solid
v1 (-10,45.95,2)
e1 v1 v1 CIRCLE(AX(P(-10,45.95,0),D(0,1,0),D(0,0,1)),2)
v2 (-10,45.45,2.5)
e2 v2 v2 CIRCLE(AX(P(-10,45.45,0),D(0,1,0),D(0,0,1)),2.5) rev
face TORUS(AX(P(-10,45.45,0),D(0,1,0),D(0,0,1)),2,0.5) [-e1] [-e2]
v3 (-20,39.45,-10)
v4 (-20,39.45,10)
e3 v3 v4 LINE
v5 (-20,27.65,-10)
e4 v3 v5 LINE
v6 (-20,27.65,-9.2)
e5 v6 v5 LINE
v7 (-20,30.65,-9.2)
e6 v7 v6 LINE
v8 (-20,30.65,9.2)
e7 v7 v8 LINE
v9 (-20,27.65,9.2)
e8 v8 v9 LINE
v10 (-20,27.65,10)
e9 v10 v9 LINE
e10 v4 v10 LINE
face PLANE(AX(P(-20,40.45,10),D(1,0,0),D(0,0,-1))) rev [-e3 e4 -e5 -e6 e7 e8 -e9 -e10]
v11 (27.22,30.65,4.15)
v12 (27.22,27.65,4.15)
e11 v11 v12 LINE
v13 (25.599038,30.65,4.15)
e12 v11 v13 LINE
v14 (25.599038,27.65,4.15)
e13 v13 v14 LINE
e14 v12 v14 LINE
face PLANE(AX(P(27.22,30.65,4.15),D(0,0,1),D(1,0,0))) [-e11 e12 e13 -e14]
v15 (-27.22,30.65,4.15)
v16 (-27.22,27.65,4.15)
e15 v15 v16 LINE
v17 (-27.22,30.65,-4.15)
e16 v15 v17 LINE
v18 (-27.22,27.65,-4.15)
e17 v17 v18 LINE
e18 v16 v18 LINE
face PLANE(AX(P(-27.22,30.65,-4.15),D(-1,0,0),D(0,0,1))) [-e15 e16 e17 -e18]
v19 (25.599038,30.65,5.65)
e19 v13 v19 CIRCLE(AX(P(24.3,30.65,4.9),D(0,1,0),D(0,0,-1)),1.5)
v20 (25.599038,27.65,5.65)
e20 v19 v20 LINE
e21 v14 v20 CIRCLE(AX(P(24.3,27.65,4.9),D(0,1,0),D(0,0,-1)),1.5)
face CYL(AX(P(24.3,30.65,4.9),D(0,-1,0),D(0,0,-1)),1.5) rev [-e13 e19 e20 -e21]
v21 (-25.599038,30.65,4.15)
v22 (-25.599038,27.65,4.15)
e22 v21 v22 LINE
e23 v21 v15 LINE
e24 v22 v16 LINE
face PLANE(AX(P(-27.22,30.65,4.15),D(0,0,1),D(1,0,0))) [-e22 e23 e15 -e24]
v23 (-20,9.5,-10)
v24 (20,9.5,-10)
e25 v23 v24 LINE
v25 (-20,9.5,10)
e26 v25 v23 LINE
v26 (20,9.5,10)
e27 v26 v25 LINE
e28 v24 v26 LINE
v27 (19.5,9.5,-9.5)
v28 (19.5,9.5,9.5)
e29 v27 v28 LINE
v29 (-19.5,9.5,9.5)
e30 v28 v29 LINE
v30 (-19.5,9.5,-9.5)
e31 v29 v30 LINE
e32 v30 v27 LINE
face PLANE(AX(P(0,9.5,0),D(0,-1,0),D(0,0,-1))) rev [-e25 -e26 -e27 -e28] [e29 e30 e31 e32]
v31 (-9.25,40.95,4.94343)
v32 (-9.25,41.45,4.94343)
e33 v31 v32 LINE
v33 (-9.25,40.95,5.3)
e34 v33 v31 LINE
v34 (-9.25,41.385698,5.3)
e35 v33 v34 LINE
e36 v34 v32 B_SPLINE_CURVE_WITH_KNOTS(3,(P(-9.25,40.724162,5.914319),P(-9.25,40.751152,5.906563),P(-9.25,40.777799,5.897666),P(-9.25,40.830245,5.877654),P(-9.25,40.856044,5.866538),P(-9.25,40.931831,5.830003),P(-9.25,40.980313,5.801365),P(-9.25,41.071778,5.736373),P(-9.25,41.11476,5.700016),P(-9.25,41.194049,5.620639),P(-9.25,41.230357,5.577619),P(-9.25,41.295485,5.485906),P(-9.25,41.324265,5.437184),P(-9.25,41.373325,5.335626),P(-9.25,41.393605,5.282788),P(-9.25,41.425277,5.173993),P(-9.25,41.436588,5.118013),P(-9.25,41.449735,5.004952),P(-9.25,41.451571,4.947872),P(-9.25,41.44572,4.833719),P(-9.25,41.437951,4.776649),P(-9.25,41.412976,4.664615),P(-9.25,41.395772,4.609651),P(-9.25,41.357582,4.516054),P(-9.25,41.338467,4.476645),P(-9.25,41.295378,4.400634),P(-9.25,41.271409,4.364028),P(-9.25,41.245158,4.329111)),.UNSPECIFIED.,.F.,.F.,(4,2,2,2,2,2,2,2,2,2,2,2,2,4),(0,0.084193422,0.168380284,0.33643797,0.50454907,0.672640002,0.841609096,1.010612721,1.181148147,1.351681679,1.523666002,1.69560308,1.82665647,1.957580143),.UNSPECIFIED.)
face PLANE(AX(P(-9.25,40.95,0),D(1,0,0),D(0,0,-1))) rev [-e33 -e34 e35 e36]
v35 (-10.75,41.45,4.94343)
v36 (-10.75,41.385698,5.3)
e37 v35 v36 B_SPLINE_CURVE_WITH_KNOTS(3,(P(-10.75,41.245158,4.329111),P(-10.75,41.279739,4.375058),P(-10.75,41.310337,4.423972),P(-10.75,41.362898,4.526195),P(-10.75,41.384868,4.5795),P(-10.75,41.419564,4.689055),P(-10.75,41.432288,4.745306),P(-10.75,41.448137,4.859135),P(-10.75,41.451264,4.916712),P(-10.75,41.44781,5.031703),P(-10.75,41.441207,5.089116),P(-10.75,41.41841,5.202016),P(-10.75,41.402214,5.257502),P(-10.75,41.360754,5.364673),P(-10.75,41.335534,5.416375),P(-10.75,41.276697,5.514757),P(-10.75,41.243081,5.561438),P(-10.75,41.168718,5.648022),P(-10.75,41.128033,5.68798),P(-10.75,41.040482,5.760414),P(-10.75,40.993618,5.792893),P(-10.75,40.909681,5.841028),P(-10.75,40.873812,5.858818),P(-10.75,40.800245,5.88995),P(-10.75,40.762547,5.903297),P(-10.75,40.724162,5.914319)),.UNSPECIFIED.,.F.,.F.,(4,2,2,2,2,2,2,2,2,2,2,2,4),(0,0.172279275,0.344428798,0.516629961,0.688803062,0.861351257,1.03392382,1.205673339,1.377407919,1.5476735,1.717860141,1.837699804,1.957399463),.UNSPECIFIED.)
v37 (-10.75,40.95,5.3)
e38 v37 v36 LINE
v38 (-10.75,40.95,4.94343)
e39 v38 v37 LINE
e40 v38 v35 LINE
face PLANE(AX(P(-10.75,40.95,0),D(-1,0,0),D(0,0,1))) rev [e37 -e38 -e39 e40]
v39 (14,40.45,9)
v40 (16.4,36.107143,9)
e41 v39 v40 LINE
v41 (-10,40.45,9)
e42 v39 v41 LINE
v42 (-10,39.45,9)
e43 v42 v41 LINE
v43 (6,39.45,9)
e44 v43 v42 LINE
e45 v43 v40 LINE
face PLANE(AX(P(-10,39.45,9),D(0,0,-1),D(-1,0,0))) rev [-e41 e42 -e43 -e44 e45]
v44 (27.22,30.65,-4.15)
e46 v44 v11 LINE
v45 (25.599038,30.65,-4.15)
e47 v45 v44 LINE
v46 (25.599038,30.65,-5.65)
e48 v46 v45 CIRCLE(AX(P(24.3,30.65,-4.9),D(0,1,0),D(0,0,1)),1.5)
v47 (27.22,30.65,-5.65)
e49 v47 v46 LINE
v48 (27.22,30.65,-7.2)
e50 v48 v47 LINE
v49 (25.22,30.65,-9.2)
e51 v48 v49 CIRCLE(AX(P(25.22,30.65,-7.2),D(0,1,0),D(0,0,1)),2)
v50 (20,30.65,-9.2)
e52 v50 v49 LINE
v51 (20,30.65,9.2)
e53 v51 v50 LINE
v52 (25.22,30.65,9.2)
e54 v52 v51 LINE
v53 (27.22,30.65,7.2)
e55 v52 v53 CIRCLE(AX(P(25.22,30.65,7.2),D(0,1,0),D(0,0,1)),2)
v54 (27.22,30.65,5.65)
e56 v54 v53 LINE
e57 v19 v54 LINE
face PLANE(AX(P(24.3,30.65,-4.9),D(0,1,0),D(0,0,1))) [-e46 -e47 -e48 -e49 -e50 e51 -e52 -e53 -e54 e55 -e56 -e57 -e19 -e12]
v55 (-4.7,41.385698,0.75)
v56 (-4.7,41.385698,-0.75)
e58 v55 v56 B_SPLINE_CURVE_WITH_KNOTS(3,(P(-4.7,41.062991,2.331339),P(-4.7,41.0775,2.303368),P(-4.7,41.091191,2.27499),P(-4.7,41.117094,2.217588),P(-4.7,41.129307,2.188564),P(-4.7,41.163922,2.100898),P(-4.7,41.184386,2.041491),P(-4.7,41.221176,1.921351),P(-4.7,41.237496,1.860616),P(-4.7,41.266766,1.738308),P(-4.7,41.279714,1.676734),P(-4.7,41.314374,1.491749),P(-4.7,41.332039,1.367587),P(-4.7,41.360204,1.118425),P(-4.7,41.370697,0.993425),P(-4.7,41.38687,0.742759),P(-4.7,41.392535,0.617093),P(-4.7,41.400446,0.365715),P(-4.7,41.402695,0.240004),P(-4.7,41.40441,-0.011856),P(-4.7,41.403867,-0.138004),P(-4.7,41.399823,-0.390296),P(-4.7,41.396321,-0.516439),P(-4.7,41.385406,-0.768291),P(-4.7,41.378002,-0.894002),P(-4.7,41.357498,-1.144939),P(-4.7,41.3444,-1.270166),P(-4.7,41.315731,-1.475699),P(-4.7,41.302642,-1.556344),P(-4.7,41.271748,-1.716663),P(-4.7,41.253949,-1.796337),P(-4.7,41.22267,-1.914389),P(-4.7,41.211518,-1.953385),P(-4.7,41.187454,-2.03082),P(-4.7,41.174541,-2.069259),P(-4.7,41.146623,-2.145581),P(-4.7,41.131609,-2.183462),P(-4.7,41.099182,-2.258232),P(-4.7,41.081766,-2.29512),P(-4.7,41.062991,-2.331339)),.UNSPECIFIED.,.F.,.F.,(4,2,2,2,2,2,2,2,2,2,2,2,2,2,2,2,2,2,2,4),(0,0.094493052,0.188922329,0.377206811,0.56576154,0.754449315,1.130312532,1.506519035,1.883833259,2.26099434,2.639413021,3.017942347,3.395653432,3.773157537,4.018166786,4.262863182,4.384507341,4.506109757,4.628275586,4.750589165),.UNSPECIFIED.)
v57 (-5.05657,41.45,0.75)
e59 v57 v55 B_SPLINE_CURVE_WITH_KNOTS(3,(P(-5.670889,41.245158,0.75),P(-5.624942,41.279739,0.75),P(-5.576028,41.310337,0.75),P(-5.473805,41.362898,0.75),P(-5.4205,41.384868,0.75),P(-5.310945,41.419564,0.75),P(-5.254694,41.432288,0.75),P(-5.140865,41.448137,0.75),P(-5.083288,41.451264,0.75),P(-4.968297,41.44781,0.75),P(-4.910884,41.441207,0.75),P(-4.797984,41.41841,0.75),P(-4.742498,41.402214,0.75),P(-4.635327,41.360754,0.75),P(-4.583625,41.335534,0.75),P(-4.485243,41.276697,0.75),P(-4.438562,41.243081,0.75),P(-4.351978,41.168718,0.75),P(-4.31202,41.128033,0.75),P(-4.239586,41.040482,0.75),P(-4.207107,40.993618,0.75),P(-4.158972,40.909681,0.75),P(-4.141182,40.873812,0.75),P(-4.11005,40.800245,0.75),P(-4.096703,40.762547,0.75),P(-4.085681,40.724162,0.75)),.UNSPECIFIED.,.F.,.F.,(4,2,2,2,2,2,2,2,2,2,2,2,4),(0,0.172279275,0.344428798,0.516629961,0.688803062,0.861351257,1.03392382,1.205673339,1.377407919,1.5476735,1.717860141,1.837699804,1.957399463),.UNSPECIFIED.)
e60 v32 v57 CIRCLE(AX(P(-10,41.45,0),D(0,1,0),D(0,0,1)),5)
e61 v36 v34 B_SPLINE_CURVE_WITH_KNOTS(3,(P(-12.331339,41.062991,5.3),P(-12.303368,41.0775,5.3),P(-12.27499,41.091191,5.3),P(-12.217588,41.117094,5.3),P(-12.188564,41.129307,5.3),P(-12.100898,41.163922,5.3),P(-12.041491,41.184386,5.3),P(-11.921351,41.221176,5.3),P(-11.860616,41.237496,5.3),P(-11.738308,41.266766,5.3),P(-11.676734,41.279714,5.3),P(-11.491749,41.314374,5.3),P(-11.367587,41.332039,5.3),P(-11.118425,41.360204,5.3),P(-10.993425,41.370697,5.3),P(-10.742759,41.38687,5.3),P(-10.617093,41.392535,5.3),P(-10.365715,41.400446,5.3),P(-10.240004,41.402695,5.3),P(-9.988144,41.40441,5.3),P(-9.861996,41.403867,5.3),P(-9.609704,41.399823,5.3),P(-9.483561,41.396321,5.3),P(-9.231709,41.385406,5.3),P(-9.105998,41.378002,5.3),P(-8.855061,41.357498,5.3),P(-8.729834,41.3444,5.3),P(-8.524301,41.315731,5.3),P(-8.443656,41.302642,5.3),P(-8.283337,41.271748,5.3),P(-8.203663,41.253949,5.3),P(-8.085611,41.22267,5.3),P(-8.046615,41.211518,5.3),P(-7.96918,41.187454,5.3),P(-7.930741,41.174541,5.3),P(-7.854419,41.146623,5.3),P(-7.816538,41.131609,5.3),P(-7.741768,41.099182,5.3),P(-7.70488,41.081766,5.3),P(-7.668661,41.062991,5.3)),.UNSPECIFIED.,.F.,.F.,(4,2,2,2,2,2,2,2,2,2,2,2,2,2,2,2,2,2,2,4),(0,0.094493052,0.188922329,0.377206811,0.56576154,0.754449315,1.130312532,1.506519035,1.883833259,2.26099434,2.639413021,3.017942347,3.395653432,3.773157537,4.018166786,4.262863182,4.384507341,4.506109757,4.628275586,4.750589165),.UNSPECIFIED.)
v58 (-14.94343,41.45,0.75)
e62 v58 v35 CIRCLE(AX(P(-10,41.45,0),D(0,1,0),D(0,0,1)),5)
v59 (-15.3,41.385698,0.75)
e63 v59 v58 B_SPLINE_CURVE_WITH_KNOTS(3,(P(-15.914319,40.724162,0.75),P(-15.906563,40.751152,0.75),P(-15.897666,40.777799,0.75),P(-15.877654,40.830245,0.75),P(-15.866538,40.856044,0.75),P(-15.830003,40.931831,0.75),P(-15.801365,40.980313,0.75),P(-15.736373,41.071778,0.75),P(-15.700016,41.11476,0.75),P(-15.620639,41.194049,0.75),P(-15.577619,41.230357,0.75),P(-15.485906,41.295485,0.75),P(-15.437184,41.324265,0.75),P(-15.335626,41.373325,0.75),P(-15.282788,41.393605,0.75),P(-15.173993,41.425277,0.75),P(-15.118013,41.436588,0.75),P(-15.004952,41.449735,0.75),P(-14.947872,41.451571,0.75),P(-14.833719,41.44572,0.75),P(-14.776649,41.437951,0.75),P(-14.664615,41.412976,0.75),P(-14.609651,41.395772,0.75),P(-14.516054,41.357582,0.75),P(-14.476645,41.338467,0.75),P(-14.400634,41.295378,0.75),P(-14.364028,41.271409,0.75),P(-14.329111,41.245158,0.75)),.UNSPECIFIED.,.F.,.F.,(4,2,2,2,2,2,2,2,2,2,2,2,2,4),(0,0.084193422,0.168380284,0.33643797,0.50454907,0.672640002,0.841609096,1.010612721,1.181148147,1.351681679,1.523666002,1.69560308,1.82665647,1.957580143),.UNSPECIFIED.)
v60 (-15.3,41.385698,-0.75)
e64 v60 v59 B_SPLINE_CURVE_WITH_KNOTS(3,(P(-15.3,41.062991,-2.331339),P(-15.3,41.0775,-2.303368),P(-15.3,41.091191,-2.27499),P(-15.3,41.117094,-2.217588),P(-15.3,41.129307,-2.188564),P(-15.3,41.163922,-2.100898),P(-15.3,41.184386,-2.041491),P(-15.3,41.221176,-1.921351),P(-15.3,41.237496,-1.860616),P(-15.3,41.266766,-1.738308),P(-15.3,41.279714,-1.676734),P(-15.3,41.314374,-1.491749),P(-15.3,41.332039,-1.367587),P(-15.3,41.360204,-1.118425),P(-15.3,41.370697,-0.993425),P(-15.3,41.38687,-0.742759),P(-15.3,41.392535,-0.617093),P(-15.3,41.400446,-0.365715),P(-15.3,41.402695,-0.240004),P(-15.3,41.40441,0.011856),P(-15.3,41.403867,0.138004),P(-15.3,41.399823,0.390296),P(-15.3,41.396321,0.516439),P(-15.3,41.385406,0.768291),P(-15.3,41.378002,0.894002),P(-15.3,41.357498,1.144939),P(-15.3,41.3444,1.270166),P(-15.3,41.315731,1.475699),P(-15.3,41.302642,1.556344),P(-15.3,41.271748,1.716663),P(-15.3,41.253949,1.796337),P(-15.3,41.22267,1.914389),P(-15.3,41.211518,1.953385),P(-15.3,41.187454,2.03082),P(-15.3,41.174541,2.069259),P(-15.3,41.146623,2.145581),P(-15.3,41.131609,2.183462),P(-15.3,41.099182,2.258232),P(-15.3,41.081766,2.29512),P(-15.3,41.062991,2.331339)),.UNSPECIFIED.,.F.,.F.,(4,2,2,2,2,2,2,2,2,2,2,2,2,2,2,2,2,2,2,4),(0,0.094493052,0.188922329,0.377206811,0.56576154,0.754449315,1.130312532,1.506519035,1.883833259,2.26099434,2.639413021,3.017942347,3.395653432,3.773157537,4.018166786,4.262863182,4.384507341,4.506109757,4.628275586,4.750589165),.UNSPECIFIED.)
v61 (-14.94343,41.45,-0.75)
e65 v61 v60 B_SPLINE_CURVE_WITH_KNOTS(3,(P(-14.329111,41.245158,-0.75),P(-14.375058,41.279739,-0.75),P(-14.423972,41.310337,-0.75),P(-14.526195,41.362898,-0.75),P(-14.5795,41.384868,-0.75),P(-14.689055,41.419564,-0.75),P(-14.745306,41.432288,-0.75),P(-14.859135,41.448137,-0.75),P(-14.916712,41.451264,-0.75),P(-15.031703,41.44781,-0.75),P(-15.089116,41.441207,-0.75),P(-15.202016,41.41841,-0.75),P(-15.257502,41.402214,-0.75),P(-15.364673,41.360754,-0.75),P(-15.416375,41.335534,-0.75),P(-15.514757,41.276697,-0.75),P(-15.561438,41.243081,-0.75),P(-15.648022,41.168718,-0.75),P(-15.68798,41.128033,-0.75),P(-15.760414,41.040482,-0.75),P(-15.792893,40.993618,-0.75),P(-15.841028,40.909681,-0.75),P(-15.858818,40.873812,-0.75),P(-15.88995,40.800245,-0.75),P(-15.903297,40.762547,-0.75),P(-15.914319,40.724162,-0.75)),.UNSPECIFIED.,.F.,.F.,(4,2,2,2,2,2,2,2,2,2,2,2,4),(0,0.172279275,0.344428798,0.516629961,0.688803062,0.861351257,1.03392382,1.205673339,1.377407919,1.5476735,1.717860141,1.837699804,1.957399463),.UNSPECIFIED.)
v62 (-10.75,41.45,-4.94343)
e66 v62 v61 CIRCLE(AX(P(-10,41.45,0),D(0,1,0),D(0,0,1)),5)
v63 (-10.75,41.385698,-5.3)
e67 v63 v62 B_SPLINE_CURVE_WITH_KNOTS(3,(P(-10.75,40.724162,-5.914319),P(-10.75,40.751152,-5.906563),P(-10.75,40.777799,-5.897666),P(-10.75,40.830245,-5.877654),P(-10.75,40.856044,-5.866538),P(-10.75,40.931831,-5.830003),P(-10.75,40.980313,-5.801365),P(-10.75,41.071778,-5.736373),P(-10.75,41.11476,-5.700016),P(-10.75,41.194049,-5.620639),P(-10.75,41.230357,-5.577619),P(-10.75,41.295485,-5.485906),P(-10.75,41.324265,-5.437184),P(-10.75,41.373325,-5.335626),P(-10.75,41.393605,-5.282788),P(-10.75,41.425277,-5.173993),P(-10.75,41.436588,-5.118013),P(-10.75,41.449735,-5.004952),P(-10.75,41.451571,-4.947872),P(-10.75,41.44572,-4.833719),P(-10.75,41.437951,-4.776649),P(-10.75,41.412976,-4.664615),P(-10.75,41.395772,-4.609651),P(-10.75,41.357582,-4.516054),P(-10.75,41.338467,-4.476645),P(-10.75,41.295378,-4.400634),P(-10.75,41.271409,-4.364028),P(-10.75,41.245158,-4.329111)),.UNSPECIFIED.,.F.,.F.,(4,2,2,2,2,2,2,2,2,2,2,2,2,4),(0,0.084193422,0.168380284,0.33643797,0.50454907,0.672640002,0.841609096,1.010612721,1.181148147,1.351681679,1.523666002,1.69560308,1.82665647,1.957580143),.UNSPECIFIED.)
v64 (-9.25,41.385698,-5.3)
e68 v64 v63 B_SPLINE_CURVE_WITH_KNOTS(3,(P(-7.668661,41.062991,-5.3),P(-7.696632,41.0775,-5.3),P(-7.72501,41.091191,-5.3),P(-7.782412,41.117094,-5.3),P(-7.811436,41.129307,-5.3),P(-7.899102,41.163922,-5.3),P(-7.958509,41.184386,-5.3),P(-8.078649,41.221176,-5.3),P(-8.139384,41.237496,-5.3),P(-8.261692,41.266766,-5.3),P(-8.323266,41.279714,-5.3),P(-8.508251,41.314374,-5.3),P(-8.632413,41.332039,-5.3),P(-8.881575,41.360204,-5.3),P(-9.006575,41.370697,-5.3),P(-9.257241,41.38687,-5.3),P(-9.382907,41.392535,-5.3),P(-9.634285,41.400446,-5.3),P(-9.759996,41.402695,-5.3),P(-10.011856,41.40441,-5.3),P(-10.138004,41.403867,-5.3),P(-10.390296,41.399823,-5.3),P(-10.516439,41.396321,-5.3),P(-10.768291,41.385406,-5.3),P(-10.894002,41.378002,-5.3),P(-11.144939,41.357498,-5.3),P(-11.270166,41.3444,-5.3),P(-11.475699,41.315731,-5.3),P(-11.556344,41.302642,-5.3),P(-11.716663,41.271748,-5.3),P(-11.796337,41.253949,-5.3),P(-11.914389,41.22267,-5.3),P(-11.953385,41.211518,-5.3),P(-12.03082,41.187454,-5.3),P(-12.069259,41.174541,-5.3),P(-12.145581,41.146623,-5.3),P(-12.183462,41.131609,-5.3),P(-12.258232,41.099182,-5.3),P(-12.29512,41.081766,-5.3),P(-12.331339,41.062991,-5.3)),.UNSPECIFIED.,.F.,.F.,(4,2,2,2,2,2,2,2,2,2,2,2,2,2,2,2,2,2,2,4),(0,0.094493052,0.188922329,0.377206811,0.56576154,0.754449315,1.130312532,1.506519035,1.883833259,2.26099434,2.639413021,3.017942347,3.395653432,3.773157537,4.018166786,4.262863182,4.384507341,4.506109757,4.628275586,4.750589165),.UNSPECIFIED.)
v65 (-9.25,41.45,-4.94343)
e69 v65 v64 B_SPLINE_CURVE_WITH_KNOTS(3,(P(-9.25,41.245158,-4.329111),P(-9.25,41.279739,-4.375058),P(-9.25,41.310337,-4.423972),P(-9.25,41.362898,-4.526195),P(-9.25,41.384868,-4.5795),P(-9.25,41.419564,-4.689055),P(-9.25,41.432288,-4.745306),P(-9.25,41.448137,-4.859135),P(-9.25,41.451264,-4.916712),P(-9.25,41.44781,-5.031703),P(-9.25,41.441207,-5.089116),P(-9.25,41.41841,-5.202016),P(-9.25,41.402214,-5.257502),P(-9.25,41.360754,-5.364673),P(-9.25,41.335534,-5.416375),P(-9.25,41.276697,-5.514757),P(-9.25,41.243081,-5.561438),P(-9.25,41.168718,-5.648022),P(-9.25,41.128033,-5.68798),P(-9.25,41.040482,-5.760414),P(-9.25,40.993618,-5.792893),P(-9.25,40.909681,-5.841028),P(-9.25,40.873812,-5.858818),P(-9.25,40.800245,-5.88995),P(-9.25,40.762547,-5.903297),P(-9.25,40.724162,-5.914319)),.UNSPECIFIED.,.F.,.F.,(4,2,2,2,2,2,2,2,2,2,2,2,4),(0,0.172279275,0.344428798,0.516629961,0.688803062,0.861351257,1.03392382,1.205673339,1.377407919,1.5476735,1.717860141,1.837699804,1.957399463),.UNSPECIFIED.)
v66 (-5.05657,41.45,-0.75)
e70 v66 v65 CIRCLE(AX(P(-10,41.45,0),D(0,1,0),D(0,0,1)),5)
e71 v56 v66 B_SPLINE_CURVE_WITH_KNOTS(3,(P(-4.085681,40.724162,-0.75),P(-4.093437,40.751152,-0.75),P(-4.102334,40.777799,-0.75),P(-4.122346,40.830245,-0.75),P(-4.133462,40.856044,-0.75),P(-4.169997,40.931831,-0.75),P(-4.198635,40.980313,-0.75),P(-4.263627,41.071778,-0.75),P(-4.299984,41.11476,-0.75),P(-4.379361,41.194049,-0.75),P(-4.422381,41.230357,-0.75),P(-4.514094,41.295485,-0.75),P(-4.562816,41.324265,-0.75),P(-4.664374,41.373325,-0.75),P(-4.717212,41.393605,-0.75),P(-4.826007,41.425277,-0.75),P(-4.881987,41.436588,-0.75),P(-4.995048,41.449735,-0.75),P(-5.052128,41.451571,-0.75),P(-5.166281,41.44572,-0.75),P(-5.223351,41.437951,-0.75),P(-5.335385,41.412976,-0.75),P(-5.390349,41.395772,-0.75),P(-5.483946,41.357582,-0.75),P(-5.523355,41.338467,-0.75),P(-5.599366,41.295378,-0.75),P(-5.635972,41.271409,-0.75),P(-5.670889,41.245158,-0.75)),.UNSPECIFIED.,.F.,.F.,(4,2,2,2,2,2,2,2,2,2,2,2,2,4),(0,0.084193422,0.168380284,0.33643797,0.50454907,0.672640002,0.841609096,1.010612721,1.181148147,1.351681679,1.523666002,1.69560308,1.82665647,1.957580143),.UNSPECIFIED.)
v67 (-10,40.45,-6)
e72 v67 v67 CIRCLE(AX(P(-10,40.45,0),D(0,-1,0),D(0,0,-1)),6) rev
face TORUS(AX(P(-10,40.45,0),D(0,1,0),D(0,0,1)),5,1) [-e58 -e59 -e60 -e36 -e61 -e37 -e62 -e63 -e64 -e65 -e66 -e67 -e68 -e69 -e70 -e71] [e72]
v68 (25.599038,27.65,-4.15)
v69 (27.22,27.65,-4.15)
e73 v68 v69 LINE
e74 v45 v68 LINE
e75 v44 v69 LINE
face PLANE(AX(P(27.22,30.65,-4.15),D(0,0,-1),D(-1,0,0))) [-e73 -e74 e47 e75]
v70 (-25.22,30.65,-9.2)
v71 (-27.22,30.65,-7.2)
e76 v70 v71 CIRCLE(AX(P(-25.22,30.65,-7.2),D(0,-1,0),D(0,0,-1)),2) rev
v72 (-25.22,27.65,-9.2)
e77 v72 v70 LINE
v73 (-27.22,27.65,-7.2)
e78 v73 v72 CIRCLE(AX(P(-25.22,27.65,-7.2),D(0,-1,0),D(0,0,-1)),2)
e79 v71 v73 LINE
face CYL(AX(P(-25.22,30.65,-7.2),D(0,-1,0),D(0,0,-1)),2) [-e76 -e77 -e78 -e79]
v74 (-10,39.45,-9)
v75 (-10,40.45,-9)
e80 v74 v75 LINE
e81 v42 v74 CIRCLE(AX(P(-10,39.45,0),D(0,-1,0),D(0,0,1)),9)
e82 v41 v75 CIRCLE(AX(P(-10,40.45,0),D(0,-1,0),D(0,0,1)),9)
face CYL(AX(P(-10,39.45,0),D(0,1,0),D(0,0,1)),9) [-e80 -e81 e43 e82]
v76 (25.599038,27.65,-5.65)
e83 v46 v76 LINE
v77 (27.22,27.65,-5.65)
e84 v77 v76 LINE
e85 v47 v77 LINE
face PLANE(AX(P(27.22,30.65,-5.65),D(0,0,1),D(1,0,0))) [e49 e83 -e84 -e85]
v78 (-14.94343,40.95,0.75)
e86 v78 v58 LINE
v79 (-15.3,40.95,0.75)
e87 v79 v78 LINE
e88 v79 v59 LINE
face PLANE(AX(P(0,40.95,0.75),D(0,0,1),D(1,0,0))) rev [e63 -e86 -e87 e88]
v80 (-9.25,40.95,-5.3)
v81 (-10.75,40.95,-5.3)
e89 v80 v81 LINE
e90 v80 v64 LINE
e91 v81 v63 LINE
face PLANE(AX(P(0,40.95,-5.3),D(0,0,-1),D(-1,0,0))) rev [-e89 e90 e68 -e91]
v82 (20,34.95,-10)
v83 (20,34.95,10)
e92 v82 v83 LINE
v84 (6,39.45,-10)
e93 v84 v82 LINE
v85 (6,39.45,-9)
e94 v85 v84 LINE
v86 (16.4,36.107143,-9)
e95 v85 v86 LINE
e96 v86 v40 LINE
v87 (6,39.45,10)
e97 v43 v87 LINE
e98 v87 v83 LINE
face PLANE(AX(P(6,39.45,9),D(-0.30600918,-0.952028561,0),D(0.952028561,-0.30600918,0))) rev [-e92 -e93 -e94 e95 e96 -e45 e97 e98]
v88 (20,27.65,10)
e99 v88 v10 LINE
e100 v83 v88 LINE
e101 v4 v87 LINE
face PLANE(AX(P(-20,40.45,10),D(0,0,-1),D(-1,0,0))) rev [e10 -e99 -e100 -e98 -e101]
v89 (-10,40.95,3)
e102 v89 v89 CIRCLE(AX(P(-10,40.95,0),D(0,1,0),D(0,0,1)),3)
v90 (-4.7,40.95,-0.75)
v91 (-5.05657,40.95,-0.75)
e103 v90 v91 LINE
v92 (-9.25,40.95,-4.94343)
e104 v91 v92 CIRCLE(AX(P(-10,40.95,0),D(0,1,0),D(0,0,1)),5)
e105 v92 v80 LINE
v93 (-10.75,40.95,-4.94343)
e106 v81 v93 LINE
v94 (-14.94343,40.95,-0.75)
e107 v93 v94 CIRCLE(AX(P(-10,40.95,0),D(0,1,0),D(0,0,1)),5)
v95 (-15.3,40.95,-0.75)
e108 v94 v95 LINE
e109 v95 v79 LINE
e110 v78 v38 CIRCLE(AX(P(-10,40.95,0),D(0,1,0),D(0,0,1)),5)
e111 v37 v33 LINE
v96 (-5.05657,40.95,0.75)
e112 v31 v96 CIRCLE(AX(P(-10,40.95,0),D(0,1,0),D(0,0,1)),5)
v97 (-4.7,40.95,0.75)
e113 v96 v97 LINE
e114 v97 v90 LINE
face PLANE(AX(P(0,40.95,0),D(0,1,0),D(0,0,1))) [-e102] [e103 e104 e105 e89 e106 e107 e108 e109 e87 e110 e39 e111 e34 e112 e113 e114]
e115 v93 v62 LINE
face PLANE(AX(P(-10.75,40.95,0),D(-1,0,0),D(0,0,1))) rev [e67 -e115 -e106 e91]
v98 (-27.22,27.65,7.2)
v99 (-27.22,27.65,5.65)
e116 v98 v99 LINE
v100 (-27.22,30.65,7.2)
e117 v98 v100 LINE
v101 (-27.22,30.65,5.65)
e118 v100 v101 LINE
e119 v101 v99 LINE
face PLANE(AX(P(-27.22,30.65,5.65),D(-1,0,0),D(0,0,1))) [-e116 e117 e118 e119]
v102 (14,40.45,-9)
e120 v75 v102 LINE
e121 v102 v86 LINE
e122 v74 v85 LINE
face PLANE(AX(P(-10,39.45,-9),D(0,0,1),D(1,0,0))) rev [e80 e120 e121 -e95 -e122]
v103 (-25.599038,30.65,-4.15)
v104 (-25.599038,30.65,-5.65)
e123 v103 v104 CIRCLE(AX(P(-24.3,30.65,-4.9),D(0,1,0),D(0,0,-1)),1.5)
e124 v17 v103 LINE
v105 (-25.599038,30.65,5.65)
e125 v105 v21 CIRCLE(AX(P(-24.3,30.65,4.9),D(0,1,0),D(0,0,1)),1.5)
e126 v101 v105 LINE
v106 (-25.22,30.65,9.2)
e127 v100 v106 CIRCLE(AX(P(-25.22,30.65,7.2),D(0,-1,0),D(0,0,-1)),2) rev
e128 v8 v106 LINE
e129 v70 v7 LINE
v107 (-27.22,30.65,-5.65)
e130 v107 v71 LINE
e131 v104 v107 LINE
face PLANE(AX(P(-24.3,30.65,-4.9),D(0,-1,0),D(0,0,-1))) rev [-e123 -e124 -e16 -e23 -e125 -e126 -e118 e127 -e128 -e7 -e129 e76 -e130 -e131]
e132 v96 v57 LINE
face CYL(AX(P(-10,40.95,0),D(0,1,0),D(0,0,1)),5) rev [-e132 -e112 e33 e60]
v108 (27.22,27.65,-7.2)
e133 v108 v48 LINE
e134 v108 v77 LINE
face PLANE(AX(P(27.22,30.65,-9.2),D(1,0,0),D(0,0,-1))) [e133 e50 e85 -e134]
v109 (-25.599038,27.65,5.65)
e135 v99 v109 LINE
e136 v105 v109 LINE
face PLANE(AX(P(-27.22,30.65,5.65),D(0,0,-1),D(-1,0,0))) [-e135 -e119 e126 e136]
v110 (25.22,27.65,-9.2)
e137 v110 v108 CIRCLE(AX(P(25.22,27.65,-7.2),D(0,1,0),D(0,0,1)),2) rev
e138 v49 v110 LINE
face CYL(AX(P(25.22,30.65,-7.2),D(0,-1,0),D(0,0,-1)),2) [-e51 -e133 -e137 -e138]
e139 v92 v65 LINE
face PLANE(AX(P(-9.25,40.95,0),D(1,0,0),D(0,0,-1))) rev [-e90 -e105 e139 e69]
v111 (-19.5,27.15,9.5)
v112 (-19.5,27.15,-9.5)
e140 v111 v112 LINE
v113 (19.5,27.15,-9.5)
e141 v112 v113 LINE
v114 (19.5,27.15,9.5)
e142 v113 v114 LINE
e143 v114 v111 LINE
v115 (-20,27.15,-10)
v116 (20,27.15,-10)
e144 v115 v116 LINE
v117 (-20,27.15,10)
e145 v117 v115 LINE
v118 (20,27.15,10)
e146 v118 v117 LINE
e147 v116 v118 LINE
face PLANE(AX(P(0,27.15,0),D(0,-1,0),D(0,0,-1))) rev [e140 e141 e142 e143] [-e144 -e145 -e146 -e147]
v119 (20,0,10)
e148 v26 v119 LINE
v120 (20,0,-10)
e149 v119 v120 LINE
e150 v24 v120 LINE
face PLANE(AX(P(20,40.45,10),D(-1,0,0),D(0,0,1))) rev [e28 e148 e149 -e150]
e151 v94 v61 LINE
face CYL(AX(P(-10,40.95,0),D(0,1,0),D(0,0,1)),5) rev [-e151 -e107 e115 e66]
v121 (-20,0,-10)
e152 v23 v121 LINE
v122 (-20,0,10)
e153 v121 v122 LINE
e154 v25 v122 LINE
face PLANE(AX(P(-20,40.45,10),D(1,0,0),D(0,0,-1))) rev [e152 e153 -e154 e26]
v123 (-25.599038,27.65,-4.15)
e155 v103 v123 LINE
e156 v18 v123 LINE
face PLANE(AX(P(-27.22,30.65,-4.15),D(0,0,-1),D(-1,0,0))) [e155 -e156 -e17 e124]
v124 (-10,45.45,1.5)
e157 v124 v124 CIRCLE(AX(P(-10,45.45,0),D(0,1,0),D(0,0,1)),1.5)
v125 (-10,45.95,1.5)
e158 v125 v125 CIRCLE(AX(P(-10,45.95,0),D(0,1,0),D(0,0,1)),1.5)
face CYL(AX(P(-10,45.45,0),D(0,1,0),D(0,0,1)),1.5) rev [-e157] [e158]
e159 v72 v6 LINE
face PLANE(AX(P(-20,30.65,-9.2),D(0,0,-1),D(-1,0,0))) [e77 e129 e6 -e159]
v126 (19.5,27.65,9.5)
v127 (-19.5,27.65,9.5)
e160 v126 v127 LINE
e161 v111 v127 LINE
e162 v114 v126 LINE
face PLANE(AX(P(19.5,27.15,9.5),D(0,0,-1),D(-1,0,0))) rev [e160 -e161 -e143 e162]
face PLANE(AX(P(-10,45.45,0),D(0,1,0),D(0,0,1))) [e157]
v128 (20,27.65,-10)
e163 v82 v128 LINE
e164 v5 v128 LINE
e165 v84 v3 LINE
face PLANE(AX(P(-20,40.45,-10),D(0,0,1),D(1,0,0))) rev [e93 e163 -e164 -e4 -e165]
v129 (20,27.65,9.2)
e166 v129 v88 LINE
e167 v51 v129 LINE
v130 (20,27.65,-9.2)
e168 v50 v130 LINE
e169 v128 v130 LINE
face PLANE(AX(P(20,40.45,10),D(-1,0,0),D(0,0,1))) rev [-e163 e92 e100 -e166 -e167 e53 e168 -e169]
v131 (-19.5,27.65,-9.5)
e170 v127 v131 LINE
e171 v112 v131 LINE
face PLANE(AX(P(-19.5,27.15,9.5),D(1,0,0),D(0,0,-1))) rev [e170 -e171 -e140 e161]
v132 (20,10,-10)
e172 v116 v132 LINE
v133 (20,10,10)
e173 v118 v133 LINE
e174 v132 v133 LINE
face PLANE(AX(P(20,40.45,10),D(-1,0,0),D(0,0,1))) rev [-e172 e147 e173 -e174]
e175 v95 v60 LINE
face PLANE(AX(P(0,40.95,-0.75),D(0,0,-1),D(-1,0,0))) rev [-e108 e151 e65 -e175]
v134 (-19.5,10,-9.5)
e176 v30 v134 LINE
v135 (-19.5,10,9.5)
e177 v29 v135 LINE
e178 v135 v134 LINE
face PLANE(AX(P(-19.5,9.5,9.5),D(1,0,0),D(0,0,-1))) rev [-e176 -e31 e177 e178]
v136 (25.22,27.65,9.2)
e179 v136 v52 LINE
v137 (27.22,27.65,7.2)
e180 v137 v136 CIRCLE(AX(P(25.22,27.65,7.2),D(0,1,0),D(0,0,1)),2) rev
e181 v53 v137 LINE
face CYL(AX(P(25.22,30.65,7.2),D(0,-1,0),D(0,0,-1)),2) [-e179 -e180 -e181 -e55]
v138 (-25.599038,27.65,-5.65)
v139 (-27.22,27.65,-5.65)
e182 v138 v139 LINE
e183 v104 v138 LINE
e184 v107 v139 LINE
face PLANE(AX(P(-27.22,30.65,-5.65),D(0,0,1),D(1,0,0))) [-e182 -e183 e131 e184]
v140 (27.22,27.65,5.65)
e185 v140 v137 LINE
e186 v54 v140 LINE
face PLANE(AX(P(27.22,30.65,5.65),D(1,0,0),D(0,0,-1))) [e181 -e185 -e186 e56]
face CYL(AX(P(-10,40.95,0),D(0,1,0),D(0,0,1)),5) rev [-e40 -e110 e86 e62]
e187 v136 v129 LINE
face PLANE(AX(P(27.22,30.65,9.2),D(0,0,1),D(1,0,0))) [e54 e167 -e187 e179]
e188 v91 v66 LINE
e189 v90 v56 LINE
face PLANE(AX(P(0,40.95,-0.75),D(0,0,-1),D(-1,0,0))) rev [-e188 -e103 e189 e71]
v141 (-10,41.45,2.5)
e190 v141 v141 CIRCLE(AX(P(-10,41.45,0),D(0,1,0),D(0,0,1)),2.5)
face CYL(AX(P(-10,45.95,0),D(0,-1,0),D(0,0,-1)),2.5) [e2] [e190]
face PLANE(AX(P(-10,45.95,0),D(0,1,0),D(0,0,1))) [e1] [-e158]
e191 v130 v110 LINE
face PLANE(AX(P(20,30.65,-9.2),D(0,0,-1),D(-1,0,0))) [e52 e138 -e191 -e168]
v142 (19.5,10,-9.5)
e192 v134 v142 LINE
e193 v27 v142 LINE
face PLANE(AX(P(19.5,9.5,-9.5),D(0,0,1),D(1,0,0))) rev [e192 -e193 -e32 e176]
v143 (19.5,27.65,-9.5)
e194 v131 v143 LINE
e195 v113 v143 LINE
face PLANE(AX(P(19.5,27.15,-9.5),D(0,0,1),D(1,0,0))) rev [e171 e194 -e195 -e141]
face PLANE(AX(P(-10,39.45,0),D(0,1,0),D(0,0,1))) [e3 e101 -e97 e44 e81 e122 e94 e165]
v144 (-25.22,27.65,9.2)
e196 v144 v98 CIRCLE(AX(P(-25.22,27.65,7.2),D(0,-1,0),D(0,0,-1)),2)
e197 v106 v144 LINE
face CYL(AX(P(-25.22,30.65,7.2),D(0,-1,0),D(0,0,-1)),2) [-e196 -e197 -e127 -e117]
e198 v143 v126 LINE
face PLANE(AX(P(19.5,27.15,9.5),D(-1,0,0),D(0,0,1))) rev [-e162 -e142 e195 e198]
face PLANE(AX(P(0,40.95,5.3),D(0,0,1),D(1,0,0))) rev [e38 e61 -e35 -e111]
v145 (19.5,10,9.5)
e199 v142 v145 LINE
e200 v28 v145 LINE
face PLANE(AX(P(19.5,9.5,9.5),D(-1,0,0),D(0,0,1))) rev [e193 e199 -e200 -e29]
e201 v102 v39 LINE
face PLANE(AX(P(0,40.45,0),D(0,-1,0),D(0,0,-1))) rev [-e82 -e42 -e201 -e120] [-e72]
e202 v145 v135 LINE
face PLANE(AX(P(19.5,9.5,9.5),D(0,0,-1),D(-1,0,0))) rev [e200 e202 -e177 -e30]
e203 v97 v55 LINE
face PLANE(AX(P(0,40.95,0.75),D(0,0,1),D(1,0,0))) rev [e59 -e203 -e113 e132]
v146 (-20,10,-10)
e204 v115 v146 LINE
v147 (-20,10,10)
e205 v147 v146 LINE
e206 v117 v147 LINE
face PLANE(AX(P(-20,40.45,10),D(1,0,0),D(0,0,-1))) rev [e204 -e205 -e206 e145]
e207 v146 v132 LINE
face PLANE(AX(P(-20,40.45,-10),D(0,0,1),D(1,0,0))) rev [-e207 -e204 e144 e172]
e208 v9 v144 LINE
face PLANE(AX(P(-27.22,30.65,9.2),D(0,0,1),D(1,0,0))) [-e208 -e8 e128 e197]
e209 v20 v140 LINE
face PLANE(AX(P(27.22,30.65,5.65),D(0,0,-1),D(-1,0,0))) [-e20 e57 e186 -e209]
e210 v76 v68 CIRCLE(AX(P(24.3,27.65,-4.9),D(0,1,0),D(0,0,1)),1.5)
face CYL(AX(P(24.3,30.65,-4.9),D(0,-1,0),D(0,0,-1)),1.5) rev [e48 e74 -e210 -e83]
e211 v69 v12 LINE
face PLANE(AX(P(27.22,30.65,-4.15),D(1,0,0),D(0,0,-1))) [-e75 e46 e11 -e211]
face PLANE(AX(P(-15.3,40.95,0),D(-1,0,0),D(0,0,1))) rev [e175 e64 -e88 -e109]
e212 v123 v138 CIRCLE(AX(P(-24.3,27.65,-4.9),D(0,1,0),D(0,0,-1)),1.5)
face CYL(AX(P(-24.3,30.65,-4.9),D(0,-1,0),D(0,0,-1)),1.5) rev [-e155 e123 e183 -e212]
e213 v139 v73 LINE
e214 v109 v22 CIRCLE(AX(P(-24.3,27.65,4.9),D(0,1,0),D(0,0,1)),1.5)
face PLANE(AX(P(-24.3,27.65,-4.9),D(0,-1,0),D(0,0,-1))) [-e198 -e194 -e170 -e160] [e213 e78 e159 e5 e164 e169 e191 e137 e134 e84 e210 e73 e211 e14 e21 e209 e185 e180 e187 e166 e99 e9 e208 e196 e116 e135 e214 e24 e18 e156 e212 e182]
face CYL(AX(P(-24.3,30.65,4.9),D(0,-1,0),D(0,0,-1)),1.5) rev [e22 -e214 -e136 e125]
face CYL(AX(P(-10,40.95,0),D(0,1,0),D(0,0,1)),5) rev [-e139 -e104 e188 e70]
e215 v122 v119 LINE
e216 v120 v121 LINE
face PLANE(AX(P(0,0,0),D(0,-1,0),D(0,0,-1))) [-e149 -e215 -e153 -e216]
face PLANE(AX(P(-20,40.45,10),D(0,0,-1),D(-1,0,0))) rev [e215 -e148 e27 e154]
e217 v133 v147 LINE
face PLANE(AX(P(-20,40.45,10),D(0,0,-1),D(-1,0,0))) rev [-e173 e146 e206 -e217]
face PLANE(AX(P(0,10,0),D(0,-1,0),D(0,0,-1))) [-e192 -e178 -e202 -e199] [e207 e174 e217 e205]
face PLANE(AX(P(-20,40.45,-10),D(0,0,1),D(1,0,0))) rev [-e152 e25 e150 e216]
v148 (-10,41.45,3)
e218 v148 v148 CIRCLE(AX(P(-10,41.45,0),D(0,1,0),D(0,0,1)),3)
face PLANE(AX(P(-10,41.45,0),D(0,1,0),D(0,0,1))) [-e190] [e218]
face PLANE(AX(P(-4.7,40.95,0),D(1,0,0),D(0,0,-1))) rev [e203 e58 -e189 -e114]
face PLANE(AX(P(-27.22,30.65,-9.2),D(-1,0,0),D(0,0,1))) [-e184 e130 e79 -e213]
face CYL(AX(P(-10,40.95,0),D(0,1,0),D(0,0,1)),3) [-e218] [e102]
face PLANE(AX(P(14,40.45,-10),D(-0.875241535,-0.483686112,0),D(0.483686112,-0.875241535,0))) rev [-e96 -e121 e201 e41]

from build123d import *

# Parameters (mm, degrees)
SKETCH_1_W          = 40
SKETCH_1_H          = 20
EXTRUDE_1_DEPTH     = 40.45
EXTRUDE_2_DEPTH     = 3
FILLET_1_R          = 2
SKETCH_4_W          = 40
SKETCH_4_H          = 20
SKETCH_4_W_2        = 39
SKETCH_4_H_2        = 19
CUT_EXTRUDE_2_DEPTH = 0.5
SKETCH_5_W          = 40
SKETCH_5_H          = 20
SKETCH_5_W_2        = 39
SKETCH_5_H_2        = 19
CUT_EXTRUDE_3_DEPTH = 0.5
SKETCH_6_R          = 6
EXTRUDE_3_DEPTH     = 1
FILLET_2_R          = 1
SKETCH_7_R          = 5
SKETCH_7_R_2        = 3
SKETCH_7_R_3        = 2.5
CUT_EXTRUDE_4_DEPTH = 0.5
CUT_EXTRUDE_6_DEPTH = 1
CUT_EXTRUDE_7_DEPTH = 1
CUT_EXTRUDE_8_DEPTH = 54.103963207
EXTRUDE_START       = 5
SKETCH_11_R         = 2.5
EXTRUDE_4_DEPTH     = 5
SKETCH_12_R         = 1.5
CUT_EXTRUDE_9_DEPTH = 0.5
FILLET_3_R          = 0.5


with BuildPart() as part:
    # 草图1 → 凸台-拉伸1 (new body)
    with BuildSketch(Plane(origin=(0, 0, 0), x_dir=(1, 0, 0), z_dir=(0, 1, 0))):
        Rectangle(SKETCH_1_W, SKETCH_1_H)
    extrude(amount=EXTRUDE_1_DEPTH)

    # 草图2 → 凸台-拉伸2 (add)
    with BuildSketch(Plane(origin=(0, 27.65, 0), x_dir=(-1, 0, 0), z_dir=(0, -1, 0))):
        with BuildLine():
            Line((20, 9.2), (27.22, 9.2))
            Line((27.22, 9.2), (27.22, 5.65))
            Line((27.22, 5.65), (25.599038106, 5.65))
            ThreePointArc((25.599038106, 5.65), (22.8, 4.9), (25.599038106, 4.15))
            Line((25.599038106, 4.15), (27.22, 4.15))
            Line((27.22, 4.15), (27.22, -4.15))
            Line((27.22, -4.15), (25.599038106, -4.15))
            ThreePointArc((25.599038106, -4.15), (22.8, -4.9), (25.599038106, -5.65))
            Line((25.599038106, -5.65), (27.22, -5.65))
            Line((27.22, -5.65), (27.22, -9.2))
            Line((27.22, -9.2), (20, -9.2))
            Line((20, -9.2), (20, 9.2))
        make_face()
        with BuildLine():
            Line((-20, 9.2), (-20, -9.2))
            Line((-20, -9.2), (-27.22, -9.2))
            Line((-27.22, -9.2), (-27.22, -5.65))
            Line((-27.22, -5.65), (-25.599038106, -5.65))
            ThreePointArc((-25.599038106, -5.65), (-22.8, -4.9), (-25.599038106, -4.15))
            Line((-25.599038106, -4.15), (-27.22, -4.15))
            Line((-27.22, -4.15), (-27.22, 4.15))
            Line((-27.22, 4.15), (-25.599038106, 4.15))
            ThreePointArc((-25.599038106, 4.15), (-22.8, 4.9), (-25.599038106, 5.65))
            Line((-25.599038106, 5.65), (-27.22, 5.65))
            Line((-27.22, 5.65), (-27.22, 9.2))
            Line((-27.22, 9.2), (-20, 9.2))
        make_face()
    extrude(amount=-EXTRUDE_2_DEPTH)

    # 圆角1
    fillet_1_edges = [part.edges().sort_by_distance(p)[0] for p in [
        (-27.22, 29.15, -9.2),
        (-27.22, 29.15, 9.2),
        (27.22, 29.15, -9.2),
        (27.22, 29.15, 9.2),
    ]]
    fillet(fillet_1_edges, radius=FILLET_1_R)

    # 草图4 → 切除-拉伸2 (cut)
    with BuildSketch(Plane(origin=(0, 27.65, 0), x_dir=(-1, 0, 0), z_dir=(0, -1, 0))):
        Rectangle(SKETCH_4_W, SKETCH_4_H)
        Rectangle(SKETCH_4_W_2, SKETCH_4_H_2, mode=Mode.SUBTRACT)
    extrude(amount=CUT_EXTRUDE_2_DEPTH, mode=Mode.SUBTRACT)

    # 草图5 → 切除-拉伸3 (cut)
    with BuildSketch(Plane(origin=(0, 10, 0), x_dir=(-1, 0, 0), z_dir=(0, -1, 0))):
        Rectangle(SKETCH_5_W, SKETCH_5_H)
        Rectangle(SKETCH_5_W_2, SKETCH_5_H_2, mode=Mode.SUBTRACT)
    extrude(amount=CUT_EXTRUDE_3_DEPTH, mode=Mode.SUBTRACT)

    # 草图6 → 凸台-拉伸3 (add)
    with BuildSketch(Plane(origin=(0, 40.45, 0), x_dir=(1, 0, 0), z_dir=(0, 1, 0))):
        with Locations(Location((-10, 0, 0), (0, 0, 90))):
            Circle(SKETCH_6_R)
    extrude(amount=EXTRUDE_3_DEPTH)

    # 圆角2
    fillet_2_edges = [part.edges().sort_by_distance(p)[0] for p in [
        (-10, 41.45, 6),
    ]]
    fillet(fillet_2_edges, radius=FILLET_2_R - 0.0001)  # a hair under: the kernel refuses the full size

    # 草图7 → 切除-拉伸4 (cut)
    # profile 1 of 6: a face of its own
    with BuildSketch(Plane(origin=(0, 41.45, 0), x_dir=(1, 0, 0), z_dir=(0, 1, 0))):
        with Locations((-10, 0)):
            Circle(SKETCH_7_R)
        with Locations(Location((-10, 0, 0), (0, 0, 270))):
            Circle(SKETCH_7_R_2, mode=Mode.SUBTRACT)
    # profile 2 of 6: a face of its own
    with BuildSketch(Plane(origin=(0, 41.45, 0), x_dir=(1, 0, 0), z_dir=(0, 1, 0))):
        with BuildLine():
            Line((-14.943429983, 0.75), (-15.3, 0.75))
            Line((-15.3, 0.75), (-15.3, -0.75))
            Line((-15.3, -0.75), (-14.943429983, -0.75))
            ThreePointArc((-14.943429983, -0.75), (-15, 0), (-14.943429983, 0.75))
        make_face()
    # profile 3 of 6: a face of its own
    with BuildSketch(Plane(origin=(0, 41.45, 0), x_dir=(1, 0, 0), z_dir=(0, 1, 0))):
        with BuildLine():
            ThreePointArc((-9.25, -4.943429983), (-10, -5), (-10.75, -4.943429983))
            Line((-10.75, -4.943429983), (-10.75, -5.3))
            Line((-10.75, -5.3), (-9.25, -5.3))
            Line((-9.25, -5.3), (-9.25, -4.943429983))
        make_face()
    # profile 4 of 6: a face of its own
    with BuildSketch(Plane(origin=(0, 41.45, 0), x_dir=(1, 0, 0), z_dir=(0, 1, 0))):
        with BuildLine():
            Line((-4.7, 0.75), (-5.056570017, 0.75))
            ThreePointArc((-5.056570017, 0.75), (-5.014162562, 0.376065209), (-5, 0))
            ThreePointArc((-5, 0), (-5.014162562, -0.376065209), (-5.056570017, -0.75))
            Line((-5.056570017, -0.75), (-4.7, -0.75))
            Line((-4.7, -0.75), (-4.7, 0.75))
        make_face()
    # profile 5 of 6: a face of its own
    with BuildSketch(Plane(origin=(0, 41.45, 0), x_dir=(1, 0, 0), z_dir=(0, 1, 0))):
        with BuildLine():
            Line((-10.75, 5.3), (-10.75, 4.943429983))
            ThreePointArc((-10.75, 4.943429983), (-10, 5), (-9.25, 4.943429983))
            Line((-9.25, 4.943429983), (-9.25, 5.3))
            Line((-9.25, 5.3), (-10.75, 5.3))
        make_face()
    # profile 6 of 6: a face of its own
    with BuildSketch(Plane(origin=(0, 41.45, 0), x_dir=(1, 0, 0), z_dir=(0, 1, 0))):
        with Locations(Location((-10, 0, 0), (0, 0, 270))):
            Circle(SKETCH_7_R_3)
    extrude(amount=-CUT_EXTRUDE_4_DEPTH, mode=Mode.SUBTRACT)

    # 草图8 → 切除-拉伸6 (cut)
    with BuildSketch(Plane(origin=(0, 40.45, 0), x_dir=(1, 0, 0), z_dir=(0, 1, 0))):
        with BuildLine():
            Line((-10, 9), (20, 9))
            Line((20, 9), (20, 10))
            Line((20, 10), (-20, 10))
            Line((-20, 10), (-20, -10))
            Line((-20, -10), (20, -10))
            Line((20, -10), (20, -9))
            Line((20, -9), (-10, -9))
            ThreePointArc((-10, -9), (-19, 0), (-10, 9))
        make_face()
    extrude(amount=-CUT_EXTRUDE_6_DEPTH, mode=Mode.SUBTRACT)

    # 草图9 → 切除-拉伸7 (cut)
    with BuildSketch(Plane.XY.offset(10)):
        Polygon((6, 39.45), (20, 34.95), (20, 39.45), align=None)
    cut_extrude_7 = extrude(amount=-CUT_EXTRUDE_7_DEPTH, mode=Mode.SUBTRACT)

    # 镜向1: 切除-拉伸7 across plane
    add(cut_extrude_7.mirror(Plane.XY), mode=Mode.SUBTRACT)

    # 草图10 → 切除-拉伸8 (cut, through all)
    with BuildSketch(Plane.XY.offset(9)):
        Polygon((14, 40.45), (16.4, 36.107142857), (20, 34.95), (20, 40.45), align=None)
    extrude(amount=-CUT_EXTRUDE_8_DEPTH, mode=Mode.SUBTRACT)

    # 草图11 → 凸台-拉伸4 (add)
    with BuildSketch(Plane(origin=(0, 40.95, 0), x_dir=(1, 0, 0), z_dir=(0, 1, 0)).offset(EXTRUDE_START)):
        with Locations(Location((-10, 0, 0), (0, 0, 270))):
            Circle(SKETCH_11_R)
    extrude(amount=-EXTRUDE_4_DEPTH)

    # 草图12 → 切除-拉伸9 (cut)
    with BuildSketch(Plane(origin=(0, 45.95, 0), x_dir=(1, 0, 0), z_dir=(0, 1, 0))):
        with Locations(Location((-10, 0, 0), (0, 0, 270))):
            Circle(SKETCH_12_R)
    extrude(amount=-CUT_EXTRUDE_9_DEPTH, mode=Mode.SUBTRACT)

    # 圆角3
    fillet_3_edges = [part.edges().sort_by_distance(p)[0] for p in [
        (-10, 45.95, -2.5),
    ]]
    fillet(fillet_3_edges, radius=FILLET_3_R)


solid = part.part
